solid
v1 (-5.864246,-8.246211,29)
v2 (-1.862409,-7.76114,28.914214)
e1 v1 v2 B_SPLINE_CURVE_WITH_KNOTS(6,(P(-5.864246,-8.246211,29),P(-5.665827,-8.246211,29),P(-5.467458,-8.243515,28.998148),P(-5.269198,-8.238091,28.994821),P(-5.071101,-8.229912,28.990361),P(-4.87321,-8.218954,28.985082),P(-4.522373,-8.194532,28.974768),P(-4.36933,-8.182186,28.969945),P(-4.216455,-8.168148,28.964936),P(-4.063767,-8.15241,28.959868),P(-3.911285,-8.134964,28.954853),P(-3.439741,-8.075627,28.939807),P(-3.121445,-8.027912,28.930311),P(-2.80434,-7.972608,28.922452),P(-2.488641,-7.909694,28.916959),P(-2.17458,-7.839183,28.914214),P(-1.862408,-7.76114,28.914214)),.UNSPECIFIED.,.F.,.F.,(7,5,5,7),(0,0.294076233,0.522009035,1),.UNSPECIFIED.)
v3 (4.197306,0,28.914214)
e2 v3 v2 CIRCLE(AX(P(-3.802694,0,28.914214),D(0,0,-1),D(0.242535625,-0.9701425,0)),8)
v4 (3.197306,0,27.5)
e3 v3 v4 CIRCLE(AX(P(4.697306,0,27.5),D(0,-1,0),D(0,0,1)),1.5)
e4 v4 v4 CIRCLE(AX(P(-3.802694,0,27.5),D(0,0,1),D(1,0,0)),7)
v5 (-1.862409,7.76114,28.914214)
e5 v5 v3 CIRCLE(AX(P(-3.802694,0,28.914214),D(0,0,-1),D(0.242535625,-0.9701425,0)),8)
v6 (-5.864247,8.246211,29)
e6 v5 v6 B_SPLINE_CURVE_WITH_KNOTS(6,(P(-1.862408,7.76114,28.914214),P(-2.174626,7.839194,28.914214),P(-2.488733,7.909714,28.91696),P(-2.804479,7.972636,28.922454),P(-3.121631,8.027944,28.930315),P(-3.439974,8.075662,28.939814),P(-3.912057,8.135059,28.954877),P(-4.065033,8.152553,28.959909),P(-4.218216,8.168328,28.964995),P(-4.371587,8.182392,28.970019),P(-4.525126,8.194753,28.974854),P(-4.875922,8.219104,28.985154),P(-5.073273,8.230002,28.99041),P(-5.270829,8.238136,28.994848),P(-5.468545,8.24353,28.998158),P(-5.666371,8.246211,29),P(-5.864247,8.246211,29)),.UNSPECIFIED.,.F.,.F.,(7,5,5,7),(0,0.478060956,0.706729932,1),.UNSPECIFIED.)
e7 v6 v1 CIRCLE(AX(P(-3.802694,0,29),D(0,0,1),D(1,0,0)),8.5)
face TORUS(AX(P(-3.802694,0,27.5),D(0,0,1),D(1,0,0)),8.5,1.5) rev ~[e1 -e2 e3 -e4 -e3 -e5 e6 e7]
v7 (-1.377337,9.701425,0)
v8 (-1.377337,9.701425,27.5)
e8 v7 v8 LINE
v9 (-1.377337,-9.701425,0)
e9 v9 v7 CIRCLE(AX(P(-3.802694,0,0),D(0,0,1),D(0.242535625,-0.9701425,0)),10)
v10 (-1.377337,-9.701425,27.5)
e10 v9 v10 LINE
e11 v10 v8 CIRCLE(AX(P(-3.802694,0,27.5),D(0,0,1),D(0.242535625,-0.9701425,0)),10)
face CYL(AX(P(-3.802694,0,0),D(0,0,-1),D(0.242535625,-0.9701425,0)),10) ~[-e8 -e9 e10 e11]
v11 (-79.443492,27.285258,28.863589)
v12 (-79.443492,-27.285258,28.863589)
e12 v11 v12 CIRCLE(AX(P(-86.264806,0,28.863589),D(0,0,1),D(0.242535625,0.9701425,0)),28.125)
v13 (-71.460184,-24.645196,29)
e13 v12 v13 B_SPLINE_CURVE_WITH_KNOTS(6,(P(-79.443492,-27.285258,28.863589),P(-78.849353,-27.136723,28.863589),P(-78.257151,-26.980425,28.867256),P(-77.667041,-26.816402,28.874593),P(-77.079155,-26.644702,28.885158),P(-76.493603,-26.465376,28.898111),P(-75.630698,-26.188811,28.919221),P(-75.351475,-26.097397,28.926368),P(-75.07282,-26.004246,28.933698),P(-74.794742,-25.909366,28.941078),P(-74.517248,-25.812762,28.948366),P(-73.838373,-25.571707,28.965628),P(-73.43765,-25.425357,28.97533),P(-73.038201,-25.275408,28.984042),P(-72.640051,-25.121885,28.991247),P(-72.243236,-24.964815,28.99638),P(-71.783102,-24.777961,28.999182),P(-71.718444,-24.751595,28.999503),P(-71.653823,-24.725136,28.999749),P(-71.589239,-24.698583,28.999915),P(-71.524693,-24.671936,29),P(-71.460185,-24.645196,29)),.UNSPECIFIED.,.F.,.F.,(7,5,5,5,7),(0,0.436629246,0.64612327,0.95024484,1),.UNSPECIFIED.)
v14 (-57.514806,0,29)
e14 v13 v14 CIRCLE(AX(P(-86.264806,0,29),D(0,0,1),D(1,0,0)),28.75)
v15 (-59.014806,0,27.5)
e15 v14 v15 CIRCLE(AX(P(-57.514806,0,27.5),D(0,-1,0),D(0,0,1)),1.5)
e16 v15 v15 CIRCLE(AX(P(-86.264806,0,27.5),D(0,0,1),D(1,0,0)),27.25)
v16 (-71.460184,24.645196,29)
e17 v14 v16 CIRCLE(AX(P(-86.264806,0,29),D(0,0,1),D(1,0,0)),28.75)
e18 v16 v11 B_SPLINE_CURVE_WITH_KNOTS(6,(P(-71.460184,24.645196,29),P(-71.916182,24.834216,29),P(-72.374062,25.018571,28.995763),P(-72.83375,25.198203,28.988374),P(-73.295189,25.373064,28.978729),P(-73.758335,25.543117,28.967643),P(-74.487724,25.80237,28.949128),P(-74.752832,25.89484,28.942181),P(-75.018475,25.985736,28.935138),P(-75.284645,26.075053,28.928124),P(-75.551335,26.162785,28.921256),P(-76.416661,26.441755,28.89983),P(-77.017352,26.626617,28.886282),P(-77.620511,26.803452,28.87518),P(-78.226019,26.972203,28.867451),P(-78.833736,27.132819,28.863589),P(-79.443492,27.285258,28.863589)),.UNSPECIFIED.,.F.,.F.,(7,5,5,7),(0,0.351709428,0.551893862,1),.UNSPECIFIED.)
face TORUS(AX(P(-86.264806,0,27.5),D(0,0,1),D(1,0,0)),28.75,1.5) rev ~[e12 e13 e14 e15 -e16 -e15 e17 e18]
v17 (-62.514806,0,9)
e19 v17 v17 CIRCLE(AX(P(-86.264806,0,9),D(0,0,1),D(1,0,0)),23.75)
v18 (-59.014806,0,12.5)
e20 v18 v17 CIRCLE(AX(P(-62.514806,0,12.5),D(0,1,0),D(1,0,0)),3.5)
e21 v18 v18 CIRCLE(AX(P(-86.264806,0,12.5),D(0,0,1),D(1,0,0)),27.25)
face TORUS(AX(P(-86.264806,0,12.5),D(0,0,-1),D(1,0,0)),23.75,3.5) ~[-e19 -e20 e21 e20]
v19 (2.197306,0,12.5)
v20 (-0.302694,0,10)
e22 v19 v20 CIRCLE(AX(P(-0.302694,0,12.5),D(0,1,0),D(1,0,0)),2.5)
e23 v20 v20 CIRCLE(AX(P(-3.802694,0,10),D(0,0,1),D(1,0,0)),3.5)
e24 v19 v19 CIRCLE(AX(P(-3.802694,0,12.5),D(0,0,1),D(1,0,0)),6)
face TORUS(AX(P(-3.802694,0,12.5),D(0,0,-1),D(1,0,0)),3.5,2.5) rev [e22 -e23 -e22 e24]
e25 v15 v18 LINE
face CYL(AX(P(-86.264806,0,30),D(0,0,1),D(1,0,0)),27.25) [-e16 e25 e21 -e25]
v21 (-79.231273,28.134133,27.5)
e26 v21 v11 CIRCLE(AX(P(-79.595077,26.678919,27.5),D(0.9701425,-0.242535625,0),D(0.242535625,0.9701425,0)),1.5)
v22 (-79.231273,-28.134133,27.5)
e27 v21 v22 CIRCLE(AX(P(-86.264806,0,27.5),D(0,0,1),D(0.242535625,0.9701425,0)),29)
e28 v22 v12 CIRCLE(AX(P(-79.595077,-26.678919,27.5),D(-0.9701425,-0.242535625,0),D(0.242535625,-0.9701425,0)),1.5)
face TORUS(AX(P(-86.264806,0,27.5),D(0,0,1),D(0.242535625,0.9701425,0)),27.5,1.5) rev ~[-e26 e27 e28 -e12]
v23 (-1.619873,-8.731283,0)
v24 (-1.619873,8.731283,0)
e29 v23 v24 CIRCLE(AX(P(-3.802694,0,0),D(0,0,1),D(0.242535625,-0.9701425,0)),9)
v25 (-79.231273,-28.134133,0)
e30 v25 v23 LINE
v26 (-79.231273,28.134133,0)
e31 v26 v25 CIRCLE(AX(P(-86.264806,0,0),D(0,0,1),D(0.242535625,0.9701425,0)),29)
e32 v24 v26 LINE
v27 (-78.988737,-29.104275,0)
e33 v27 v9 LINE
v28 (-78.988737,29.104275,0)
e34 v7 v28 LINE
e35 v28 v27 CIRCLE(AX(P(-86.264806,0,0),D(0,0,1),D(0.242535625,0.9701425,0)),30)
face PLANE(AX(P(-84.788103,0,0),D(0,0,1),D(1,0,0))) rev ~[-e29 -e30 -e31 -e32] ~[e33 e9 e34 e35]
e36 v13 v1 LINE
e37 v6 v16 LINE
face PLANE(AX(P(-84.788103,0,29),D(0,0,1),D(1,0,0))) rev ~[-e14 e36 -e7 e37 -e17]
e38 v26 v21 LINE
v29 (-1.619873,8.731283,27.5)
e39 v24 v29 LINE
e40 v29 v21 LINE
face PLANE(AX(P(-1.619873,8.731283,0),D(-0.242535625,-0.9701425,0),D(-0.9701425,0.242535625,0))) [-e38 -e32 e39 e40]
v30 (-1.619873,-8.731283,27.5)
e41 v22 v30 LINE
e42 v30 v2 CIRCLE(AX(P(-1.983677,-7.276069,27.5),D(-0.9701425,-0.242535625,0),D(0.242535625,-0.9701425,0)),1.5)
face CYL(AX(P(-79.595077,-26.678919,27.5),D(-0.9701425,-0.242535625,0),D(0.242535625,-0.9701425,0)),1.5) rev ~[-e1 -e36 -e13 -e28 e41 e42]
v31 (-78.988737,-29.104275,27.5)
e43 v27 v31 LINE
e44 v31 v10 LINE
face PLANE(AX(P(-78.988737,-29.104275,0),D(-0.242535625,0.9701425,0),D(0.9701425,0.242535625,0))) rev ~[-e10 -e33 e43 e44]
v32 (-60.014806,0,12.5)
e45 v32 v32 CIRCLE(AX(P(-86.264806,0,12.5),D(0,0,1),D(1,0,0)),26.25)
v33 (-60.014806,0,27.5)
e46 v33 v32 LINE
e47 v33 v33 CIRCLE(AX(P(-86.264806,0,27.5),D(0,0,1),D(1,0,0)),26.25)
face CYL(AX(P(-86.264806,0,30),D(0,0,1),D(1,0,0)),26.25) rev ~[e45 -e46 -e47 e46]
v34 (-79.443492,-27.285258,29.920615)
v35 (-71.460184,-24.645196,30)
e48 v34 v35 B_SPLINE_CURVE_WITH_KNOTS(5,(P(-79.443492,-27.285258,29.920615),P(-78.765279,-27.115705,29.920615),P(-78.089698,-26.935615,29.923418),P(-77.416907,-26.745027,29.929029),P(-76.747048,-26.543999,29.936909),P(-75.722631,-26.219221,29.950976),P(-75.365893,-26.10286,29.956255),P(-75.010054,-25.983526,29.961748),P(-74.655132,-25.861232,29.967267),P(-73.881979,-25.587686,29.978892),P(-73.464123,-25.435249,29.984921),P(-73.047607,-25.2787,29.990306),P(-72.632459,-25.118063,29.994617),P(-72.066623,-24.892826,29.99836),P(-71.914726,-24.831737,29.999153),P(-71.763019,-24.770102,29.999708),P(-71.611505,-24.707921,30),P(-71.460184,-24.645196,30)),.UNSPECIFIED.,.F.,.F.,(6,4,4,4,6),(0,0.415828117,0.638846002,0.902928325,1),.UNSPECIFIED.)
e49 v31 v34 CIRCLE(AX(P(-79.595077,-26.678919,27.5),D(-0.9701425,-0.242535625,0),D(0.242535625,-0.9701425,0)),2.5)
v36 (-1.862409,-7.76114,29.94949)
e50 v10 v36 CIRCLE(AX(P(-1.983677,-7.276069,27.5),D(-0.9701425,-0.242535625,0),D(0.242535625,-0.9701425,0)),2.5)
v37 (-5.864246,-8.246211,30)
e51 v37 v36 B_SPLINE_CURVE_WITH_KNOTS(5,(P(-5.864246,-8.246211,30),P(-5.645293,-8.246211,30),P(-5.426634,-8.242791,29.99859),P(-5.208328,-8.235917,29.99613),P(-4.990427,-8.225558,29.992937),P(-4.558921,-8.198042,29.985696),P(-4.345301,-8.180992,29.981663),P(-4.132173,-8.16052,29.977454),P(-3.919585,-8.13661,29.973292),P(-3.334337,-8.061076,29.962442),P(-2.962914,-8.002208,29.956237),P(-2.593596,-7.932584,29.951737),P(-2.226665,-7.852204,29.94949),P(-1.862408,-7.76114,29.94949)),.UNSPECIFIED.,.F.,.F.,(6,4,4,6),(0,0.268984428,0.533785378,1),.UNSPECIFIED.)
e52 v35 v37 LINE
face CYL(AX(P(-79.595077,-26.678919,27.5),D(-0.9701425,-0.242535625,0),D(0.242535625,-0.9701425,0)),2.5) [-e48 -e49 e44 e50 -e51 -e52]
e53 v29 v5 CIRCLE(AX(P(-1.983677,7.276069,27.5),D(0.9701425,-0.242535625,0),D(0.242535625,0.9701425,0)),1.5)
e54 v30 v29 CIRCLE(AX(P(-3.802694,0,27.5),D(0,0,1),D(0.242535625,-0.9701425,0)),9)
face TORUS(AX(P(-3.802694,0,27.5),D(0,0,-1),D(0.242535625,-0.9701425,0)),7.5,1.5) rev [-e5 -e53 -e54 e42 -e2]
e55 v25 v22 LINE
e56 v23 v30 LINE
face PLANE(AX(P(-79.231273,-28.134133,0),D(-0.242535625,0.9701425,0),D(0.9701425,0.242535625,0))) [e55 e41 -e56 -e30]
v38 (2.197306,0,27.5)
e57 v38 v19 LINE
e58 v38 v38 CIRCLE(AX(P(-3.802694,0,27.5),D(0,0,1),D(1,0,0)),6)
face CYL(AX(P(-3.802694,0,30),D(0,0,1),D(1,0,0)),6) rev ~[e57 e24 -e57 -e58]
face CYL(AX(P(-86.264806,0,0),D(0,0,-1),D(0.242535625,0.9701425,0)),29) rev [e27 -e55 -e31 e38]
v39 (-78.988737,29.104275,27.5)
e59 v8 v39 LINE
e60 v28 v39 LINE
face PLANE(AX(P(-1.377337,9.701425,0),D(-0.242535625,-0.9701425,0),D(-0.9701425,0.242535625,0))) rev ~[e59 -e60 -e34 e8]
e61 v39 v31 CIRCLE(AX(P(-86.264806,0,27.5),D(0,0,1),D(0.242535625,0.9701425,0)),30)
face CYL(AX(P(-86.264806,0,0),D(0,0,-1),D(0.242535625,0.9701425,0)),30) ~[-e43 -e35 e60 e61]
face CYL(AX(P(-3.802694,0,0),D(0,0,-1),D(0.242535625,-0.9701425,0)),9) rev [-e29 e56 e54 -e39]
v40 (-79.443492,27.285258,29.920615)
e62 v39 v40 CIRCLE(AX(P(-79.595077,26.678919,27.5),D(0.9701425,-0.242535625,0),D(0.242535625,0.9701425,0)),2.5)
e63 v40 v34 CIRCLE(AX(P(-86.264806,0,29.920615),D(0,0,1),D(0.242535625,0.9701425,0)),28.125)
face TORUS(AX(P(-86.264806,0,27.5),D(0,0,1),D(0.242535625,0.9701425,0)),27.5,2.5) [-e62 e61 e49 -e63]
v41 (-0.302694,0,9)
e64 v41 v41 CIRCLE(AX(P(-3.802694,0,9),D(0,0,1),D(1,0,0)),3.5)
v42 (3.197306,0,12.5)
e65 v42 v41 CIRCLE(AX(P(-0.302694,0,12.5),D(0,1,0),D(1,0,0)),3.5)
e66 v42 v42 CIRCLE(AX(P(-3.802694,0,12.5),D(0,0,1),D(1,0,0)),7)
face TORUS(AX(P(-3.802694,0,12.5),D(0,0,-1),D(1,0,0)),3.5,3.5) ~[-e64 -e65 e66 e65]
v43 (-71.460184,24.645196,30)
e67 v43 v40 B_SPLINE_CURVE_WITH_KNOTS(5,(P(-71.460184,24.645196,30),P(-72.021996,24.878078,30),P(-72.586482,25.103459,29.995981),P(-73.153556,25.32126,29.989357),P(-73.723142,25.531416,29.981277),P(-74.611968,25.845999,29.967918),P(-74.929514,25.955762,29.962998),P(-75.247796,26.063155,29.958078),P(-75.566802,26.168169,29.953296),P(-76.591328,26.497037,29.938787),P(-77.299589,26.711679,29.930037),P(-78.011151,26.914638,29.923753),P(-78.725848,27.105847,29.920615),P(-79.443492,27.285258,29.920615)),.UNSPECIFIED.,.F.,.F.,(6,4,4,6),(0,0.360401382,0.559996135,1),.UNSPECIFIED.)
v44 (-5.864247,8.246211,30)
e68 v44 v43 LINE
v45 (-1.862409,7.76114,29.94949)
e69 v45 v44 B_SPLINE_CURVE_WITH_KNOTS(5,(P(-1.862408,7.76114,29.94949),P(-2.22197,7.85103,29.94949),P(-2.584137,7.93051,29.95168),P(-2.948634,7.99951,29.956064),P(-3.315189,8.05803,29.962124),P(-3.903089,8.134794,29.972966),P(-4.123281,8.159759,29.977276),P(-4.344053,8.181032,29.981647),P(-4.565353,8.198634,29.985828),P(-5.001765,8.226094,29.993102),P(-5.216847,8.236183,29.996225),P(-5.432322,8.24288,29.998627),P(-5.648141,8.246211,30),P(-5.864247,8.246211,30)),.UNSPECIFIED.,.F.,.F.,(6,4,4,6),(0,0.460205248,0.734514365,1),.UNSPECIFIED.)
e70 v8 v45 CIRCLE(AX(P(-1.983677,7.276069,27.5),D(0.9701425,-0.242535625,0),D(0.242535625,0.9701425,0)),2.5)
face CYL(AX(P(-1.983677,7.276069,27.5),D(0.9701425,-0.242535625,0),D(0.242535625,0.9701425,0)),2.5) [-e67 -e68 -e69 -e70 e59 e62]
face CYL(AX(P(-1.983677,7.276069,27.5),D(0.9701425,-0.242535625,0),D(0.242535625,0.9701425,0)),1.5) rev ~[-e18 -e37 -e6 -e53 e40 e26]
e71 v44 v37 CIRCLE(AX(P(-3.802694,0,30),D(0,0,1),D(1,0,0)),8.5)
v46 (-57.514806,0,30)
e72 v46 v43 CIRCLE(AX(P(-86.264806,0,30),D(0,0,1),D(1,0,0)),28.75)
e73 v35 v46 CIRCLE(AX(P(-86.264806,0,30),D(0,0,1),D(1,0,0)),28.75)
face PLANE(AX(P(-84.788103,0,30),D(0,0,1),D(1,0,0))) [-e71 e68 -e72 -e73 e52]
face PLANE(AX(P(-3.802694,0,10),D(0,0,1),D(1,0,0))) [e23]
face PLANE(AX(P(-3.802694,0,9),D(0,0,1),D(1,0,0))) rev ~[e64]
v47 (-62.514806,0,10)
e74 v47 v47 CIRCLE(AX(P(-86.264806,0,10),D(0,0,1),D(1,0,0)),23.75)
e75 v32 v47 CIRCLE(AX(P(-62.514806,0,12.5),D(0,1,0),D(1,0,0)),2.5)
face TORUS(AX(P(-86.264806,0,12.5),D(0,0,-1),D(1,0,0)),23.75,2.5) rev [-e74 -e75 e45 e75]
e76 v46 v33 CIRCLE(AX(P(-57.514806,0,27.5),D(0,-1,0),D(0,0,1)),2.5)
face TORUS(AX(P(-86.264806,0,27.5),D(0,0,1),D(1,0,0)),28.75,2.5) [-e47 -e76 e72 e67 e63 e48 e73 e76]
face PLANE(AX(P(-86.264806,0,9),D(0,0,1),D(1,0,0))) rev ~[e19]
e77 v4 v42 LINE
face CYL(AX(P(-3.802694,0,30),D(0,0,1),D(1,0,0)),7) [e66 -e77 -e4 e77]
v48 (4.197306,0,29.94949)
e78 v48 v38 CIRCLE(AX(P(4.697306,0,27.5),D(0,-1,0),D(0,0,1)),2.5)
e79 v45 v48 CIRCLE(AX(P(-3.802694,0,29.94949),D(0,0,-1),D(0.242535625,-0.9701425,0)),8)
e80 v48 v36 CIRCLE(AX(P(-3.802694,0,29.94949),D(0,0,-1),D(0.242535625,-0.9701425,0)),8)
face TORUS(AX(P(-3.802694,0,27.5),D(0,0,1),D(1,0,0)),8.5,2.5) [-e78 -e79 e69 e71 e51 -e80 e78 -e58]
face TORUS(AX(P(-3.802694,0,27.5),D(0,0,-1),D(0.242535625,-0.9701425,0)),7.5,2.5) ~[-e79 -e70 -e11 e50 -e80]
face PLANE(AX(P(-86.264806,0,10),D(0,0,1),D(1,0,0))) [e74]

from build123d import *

# Parameters (mm, degrees)
F1_DEPTH     = 30
F2_R         = 26.25
F2_R_2       = 6
F3_DEPTH     = 20
F4_T5_DEPTH  = 80
F4_T7_DEPTH  = 80
F4_T10_ANGLE = 208.0724869359
F4_T12_ANGLE = 151.9275130641
F5_T         = -1


# Not quite as in the source:
# - a fillet or chamfer that OpenCascade refuses, or shapes differently, is made with other operations: its cross-section is extruded or revolved along the edge and cut away or added


with BuildPart() as f1:
    # F0 (on Top) → F1 (new body)
    with BuildSketch(Plane.XY):
        with BuildLine():
            ThreePointArc((-78.9887374496, -29.1042750044), (-62.6186430602, -18.4623662821), (-56.2648062007, 0))
            ThreePointArc((-56.2648062007, 0), (-62.6186430602, 18.4623662821), (-78.9887374496, 29.1042750044))
            ThreePointArc((-78.9887374496, 29.1042750044), (-116.2648062007, 0), (-78.9887374496, -29.1042750044))
        make_face()
        with BuildLine():
            ThreePointArc((-78.9887374496, 29.1042750044), (-62.6186430602, 18.4623662821), (-56.2648062007, 0))
            ThreePointArc((-56.2648062007, 0), (-62.6186430602, -18.4623662821), (-78.9887374496, -29.1042750044))
            Line((-78.9887374496, -29.1042750044), (-1.377337438, -9.7014250015))
            ThreePointArc((-1.377337438, -9.7014250015), (-13.8026936884, 0), (-1.377337438, 9.7014250015))
            Line((-1.377337438, 9.7014250015), (-78.9887374496, 29.1042750044))
        make_face()
        with BuildLine():
            ThreePointArc((6.1973063116, 0), (4.0793606918, 6.154122094), (-1.377337438, 9.7014250015))
            ThreePointArc((-1.377337438, 9.7014250015), (-13.8026936884, 0), (-1.377337438, -9.7014250015))
            ThreePointArc((-1.377337438, -9.7014250015), (4.0793606918, -6.154122094), (6.1973063116, 0))
        make_face()
    extrude(amount=F1_DEPTH)

    # F2 (on face) → F3 (cut)
    with BuildSketch(Plane.XY.offset(30)):
        with Locations((-86.2648062007, 0)):
            Circle(F2_R)
        with Locations((-3.8026936884, 0)):
            Circle(F2_R_2)
    extrude(amount=-F3_DEPTH, mode=Mode.SUBTRACT)

    # F4: fillet of radius 2.5 on 8 edges, made by hand

    # F4_s1 → F4_t2 (revolve)
    with BuildSketch(Plane.XZ):
        with BuildLine():
            ThreePointArc((-60.0148062007, 12.5), (-60.7470392478, 10.732233047), (-62.5148062007, 10))
            Line((-62.5148062007, 10), (-60.0148062007, 10))
            Line((-60.0148062007, 10), (-60.0148062007, 12.5))
        make_face()
    revolve(axis=Axis((-86.2648062007, 0, 10), (0, 0, 1)))

    # F4_s3 → F4_t4 (revolve)
    with BuildSketch(Plane.XZ):
        with BuildLine():
            ThreePointArc((2.1973063116, 12.5), (1.4650732646, 10.732233047), (-0.3026936884, 10))
            Line((-0.3026936884, 10), (2.1973063116, 10))
            Line((2.1973063116, 10), (2.1973063116, 12.5))
        make_face()
    revolve(axis=Axis((-3.8026936884, 0, 10), (0, 0, 1)))

    # F4_s6 → F4_t5 (cut)
    with BuildSketch(Plane(origin=(-3.5790058244, 0.8947514561, 0), x_dir=(0, 0, 1), z_dir=(-0.9701425001, 0.242535625, 0))):
        with BuildLine():
            ThreePointArc((27.5, 9.0777113095), (29.267766953, 8.3454782624), (30, 6.5777113095))
            Line((30, 6.5777113095), (30, 9.0777113095))
            Line((30, 9.0777113095), (27.5, 9.0777113095))
        make_face()
    extrude(amount=F4_T5_DEPTH, mode=Mode.SUBTRACT)

    # F4_s8 → F4_t7 (cut)
    with BuildSketch(Plane(origin=(-81.190405836, -20.297601459, 0), x_dir=(0, 0, 1), z_dir=(0.9701425001, 0.242535625, 0))):
        with BuildLine():
            ThreePointArc((27.5, 9.0777113095), (29.267766953, 8.3454782624), (30, 6.5777113095))
            Line((30, 6.5777113095), (30, 9.0777113095))
            Line((30, 9.0777113095), (27.5, 9.0777113095))
        make_face()
    extrude(amount=F4_T7_DEPTH, mode=Mode.SUBTRACT)

    # F4_s9 → F4_t10 (revolve, cut)
    with BuildSketch(Plane(origin=(-81.190405836, 20.297601459, 0), x_dir=(0, 0, 1), z_dir=(0.9701425001, -0.242535625, 0))):
        with BuildLine():
            ThreePointArc((27.5, -9.0777113095), (29.267766953, -8.3454782624), (30, -6.5777113095))
            Line((30, -6.5777113095), (30, -9.0777113095))
            Line((30, -9.0777113095), (27.5, -9.0777113095))
        make_face()
    revolve(axis=Axis((-86.2648062007, 0, 30), (0, 0, 1)), revolution_arc=F4_T10_ANGLE, mode=Mode.SUBTRACT)

    # F4_s11 → F4_t12 (revolve, cut)
    with BuildSketch(Plane(origin=(-3.5790058244, -0.8947514561, 0), x_dir=(0, 0, 1), z_dir=(-0.9701425001, -0.242535625, 0))):
        with BuildLine():
            ThreePointArc((30, -6.5777113095), (29.267766953, -8.3454782624), (27.5, -9.0777113095))
            Line((27.5, -9.0777113095), (30, -9.0777113095))
            Line((30, -9.0777113095), (30, -6.5777113095))
        make_face()
    revolve(axis=Axis((-3.8026936884, 0, 30), (0, 0, 1)), revolution_arc=F4_T12_ANGLE, mode=Mode.SUBTRACT)

    # F4_s13 → F4_t14 (revolve, cut)
    with BuildSketch(Plane.XZ):
        with BuildLine():
            ThreePointArc((-57.5148062007, 30), (-59.2825731537, 29.267766953), (-60.0148062007, 27.5))
            Line((-60.0148062007, 27.5), (-60.0148062007, 30))
            Line((-60.0148062007, 30), (-57.5148062007, 30))
        make_face()
    revolve(axis=Axis((-86.2648062007, 0, 30), (0, 0, 1)), mode=Mode.SUBTRACT)

    # F4_s15 → F4_t16 (revolve, cut)
    with BuildSketch(Plane.XZ):
        with BuildLine():
            ThreePointArc((4.6973063116, 30), (2.9295393587, 29.267766953), (2.1973063116, 27.5))
            Line((2.1973063116, 27.5), (2.1973063116, 30))
            Line((2.1973063116, 30), (4.6973063116, 30))
        make_face()
    revolve(axis=Axis((-3.8026936884, 0, 30), (0, 0, 1)), mode=Mode.SUBTRACT)

    # F5
    f5_openings = [f1.faces().sort_by_distance(p)[0] for p in [
        (-63.619436, 0, 0),
    ]]
    offset(amount=F5_T, openings=f5_openings)


solid = f1.part
